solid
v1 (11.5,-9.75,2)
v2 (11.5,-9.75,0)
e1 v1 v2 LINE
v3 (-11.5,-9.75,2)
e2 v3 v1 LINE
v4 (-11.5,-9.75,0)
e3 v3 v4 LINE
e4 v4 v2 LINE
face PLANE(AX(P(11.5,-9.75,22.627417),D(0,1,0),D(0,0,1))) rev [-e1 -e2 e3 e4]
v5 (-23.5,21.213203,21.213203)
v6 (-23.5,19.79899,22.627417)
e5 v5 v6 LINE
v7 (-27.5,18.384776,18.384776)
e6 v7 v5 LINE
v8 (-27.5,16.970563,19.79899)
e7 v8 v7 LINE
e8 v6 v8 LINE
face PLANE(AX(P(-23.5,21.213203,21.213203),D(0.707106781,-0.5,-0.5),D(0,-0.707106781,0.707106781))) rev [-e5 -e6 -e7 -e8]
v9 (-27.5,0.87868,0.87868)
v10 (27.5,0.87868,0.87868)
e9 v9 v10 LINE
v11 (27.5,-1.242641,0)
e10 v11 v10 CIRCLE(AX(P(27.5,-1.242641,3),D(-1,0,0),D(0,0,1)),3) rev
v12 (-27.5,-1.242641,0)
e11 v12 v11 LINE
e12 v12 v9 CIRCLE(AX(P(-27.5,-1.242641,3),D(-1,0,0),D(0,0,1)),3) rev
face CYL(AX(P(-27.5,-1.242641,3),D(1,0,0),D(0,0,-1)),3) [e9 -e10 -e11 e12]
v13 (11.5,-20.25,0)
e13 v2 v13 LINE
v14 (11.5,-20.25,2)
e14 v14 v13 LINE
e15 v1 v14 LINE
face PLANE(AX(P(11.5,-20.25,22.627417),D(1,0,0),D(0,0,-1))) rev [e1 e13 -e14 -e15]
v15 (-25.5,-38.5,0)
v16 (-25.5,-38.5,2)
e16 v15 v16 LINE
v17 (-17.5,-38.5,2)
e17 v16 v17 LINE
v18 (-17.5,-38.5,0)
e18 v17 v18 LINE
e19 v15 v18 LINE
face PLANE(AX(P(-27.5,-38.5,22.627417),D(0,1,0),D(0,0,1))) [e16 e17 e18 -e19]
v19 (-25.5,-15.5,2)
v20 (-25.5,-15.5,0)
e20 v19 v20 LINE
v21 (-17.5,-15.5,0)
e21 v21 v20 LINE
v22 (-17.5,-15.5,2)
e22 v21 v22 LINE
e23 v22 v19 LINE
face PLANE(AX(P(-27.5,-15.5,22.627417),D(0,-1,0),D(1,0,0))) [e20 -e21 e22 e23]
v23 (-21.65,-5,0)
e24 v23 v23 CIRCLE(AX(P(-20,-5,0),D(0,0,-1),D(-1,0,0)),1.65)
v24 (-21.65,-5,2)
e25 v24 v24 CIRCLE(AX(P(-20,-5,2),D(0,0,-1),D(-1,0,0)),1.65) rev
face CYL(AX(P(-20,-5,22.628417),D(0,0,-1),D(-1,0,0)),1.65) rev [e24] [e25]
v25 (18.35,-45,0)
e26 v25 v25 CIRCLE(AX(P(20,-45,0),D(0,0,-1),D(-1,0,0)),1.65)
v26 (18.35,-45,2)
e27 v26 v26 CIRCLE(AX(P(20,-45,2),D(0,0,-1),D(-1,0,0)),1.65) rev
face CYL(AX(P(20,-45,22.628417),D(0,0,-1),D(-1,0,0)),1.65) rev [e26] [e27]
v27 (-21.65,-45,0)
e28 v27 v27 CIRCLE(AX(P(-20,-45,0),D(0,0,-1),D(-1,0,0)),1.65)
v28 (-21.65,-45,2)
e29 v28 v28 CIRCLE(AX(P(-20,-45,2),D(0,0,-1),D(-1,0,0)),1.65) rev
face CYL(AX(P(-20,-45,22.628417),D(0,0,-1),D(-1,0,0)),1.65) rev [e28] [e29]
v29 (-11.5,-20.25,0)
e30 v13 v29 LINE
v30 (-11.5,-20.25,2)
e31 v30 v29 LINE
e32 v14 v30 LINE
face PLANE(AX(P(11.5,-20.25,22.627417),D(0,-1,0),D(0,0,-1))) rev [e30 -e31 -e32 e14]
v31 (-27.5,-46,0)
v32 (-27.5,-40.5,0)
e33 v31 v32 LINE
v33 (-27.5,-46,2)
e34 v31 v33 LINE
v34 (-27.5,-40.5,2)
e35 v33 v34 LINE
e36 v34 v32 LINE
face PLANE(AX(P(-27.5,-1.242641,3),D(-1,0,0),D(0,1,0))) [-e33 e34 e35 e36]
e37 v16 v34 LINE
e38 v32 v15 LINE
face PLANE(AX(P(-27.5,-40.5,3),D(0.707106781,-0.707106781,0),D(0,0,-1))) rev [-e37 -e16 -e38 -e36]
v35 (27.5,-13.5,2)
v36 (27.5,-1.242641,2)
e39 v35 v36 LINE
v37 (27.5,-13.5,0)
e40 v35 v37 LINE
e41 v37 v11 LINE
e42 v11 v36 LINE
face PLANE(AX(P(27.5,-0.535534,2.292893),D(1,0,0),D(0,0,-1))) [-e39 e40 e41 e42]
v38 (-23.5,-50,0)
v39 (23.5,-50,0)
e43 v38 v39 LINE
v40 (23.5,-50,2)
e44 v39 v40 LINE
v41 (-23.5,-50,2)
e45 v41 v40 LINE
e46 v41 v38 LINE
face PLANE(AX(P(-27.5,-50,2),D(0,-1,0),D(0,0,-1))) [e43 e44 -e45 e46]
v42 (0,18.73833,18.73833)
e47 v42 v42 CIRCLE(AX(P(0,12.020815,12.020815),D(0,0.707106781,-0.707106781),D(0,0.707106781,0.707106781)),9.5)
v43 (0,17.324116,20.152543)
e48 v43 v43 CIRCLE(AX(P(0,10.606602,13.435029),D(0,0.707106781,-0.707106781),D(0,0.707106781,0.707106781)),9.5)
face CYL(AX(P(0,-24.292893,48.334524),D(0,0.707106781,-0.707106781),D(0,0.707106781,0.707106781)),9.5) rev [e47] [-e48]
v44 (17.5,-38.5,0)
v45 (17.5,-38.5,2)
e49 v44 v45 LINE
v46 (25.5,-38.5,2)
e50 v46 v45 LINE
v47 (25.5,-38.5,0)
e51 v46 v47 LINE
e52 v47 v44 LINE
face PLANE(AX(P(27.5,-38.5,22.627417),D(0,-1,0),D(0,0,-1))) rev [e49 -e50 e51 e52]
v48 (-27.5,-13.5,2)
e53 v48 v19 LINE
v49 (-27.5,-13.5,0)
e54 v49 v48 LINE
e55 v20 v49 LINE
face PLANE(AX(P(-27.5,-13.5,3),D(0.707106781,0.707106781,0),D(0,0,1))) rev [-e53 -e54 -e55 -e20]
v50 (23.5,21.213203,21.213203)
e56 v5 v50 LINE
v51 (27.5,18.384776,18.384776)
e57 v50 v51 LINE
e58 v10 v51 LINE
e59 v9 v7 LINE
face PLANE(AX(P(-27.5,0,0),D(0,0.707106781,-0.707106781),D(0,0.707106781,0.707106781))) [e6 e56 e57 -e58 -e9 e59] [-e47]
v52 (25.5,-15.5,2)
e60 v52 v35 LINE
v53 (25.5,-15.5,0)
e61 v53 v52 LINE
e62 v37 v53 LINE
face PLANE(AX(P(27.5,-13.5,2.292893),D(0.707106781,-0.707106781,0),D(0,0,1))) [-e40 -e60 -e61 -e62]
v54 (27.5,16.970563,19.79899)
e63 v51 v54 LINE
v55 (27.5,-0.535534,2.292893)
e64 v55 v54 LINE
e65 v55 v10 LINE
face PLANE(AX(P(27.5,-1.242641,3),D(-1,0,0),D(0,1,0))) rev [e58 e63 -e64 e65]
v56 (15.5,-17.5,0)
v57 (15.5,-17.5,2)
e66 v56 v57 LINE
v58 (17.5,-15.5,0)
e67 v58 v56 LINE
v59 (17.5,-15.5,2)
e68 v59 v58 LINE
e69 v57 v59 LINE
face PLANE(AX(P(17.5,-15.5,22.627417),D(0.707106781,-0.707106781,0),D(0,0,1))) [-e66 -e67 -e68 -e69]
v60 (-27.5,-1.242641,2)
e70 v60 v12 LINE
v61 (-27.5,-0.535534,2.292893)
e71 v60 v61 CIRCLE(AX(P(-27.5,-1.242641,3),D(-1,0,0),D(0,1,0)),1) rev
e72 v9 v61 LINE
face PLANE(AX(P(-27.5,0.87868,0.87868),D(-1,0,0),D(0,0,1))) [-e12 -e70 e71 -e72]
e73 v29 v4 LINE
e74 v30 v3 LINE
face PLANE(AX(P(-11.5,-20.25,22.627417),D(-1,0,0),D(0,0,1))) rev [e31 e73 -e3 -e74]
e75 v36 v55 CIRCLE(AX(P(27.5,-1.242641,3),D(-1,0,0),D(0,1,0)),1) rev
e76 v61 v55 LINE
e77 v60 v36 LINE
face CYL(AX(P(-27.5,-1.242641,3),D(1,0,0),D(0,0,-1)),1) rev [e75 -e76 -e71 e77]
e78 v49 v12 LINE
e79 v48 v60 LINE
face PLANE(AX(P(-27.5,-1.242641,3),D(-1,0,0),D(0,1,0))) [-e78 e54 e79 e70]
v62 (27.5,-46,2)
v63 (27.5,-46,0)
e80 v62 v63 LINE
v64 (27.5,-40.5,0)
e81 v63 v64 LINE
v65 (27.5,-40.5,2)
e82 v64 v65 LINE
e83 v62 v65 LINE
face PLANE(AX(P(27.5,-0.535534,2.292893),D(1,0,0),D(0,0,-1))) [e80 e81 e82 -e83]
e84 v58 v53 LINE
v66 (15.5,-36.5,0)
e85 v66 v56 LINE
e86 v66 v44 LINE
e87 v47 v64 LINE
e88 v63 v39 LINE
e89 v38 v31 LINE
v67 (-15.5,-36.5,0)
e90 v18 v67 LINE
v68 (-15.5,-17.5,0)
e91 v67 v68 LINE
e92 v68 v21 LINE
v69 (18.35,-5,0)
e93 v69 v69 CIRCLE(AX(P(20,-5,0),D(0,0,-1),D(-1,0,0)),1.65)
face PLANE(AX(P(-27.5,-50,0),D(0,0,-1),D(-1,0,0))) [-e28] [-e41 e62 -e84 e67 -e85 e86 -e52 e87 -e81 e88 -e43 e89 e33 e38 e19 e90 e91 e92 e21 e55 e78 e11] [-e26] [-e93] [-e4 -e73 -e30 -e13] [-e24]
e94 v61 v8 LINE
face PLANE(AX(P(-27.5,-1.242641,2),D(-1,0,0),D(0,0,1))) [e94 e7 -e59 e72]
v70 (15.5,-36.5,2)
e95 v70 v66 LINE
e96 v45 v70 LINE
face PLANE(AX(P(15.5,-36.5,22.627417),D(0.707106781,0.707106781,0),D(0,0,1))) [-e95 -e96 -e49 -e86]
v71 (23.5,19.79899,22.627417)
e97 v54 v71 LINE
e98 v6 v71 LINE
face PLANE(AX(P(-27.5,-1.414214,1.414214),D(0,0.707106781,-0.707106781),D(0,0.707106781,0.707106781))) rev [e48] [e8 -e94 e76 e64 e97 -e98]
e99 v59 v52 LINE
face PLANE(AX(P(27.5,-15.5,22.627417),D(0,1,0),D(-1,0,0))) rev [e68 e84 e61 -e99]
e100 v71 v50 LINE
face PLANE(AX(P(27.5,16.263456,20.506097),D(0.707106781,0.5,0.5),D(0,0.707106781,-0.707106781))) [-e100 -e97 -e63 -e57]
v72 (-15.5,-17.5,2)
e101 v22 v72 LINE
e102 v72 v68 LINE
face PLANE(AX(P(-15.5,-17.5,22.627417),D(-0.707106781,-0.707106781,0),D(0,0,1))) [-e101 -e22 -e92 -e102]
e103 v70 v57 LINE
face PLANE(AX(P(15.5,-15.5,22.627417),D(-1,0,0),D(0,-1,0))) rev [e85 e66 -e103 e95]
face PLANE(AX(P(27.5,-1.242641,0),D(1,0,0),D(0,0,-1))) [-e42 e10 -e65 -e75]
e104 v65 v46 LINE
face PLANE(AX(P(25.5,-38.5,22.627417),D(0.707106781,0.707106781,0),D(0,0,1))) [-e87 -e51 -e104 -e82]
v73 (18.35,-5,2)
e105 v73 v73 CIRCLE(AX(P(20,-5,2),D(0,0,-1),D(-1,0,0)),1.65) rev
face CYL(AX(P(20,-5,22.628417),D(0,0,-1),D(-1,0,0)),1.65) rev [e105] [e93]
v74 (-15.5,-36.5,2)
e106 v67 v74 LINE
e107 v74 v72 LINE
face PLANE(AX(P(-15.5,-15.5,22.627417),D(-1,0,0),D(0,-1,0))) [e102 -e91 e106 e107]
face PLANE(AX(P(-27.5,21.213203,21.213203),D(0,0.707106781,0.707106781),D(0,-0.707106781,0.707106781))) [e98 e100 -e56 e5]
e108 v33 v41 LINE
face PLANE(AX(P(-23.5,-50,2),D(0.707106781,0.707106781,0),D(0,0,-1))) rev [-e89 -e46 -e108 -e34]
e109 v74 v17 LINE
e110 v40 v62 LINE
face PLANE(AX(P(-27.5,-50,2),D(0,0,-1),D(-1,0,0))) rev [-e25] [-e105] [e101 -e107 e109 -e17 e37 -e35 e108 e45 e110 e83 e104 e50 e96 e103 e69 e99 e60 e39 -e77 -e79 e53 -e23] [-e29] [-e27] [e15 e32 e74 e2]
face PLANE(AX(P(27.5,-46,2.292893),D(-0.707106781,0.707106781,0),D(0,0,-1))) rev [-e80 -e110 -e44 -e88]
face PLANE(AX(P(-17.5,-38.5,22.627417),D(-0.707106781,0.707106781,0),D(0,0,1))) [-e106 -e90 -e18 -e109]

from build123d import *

# Parameters (mm, degrees)
SM_BASE_FLANGE_1_DEPTH = 27.5
CHAMFER_1_SIZE         = 4
SKETCH_6_R             = 9.5
CUT_EXTRUDE_1_DEPTH    = 62.386073339
SKETCH_7_W             = 12
SKETCH_7_H             = 23
CUT_EXTRUDE_2_DEPTH    = 62.386073339
CHAMFER_2_SIZE         = 2
SKETCH_9_W             = 23
SKETCH_9_H             = 10.5
CUT_EXTRUDE_4_DEPTH    = 62.386073339
CUT_EXTRUDE_5_REACH    = 63.386
SKETCH_10_R            = 1.65


# Sheet-metal steps are written as plain solids
with BuildPart() as part:
    # Sketch 1 → 基材-凸緣1 (new, symmetric)
    with BuildSketch(Plane(origin=(0, 0, 0), x_dir=(0, 1, 0), z_dir=(-1, 0, 0))):
        with BuildLine():
            Line((-50, 0), (-1.242640687, 0))
            ThreePointArc((-1.242640687, 0), (-0.09459039, -0.228361402), (0.878679656, -0.878679656))
            Line((0.878679656, -0.878679656), (21.213203436, -21.213203436))
            Line((21.213203436, -21.213203436), (19.798989873, -22.627416998))
            Line((19.798989873, -22.627416998), (-0.535533906, -2.292893219))
            ThreePointArc((-0.535533906, -2.292893219), (-0.859957255, -2.076120467), (-1.242640687, -2))
            Line((-1.242640687, -2), (-50, -2))
            Line((-50, -2), (-50, 0))
        make_face()
    extrude(amount=SM_BASE_FLANGE_1_DEPTH, both=True)

    # 導角1
    chamfer_1_edges = [part.edges().sort_by_distance(p)[0] for p in [
        (-27.5, -50, 1),
        (-27.5, 20.506096654, 21.920310217),
        (27.5, -50, 1),
        (27.5, 20.506096654, 21.920310217),
    ]]
    chamfer(chamfer_1_edges, length=CHAMFER_1_SIZE)

    # 草圖6 → 除料-伸長1 (cut, through all)
    with BuildSketch(Plane(origin=(0, 0, 0), x_dir=(-0.9655064458746985, -0.1841158643007276, -0.18411586430072824), z_dir=(0, 0.7071067811865488, -0.7071067811865465))):
        with Locations(Location((-4.42644559, 16.41360958, 0), (0, 0, 105.092560886))):
            Circle(SKETCH_6_R)
    extrude(amount=-CUT_EXTRUDE_1_DEPTH, mode=Mode.SUBTRACT)

    # 草圖7 → 除料-伸長2 (cut, through all)
    with BuildSketch(Plane(origin=(0, 0, 0), x_dir=(-1, 0, 0), z_dir=(0, 0, -1))):
        with Locations((-21.5, -27)):
            Rectangle(SKETCH_7_W, SKETCH_7_H)
    cut_extrude_2 = extrude(amount=-CUT_EXTRUDE_2_DEPTH, mode=Mode.SUBTRACT)

    # 鏡射1: 除料-伸長2 across plane
    add(cut_extrude_2.mirror(Plane(origin=(0, 0, 0), x_dir=(0, 0, 1), z_dir=(1, 0, 0))), mode=Mode.SUBTRACT)

    # 導角2
    chamfer_2_edges = [part.edges().sort_by_distance(p)[0] for p in [
        (-15.5, -38.5, 1),
        (-15.5, -15.5, 1),
        (27.5, -38.5, 1),
        (27.5, -15.5, 1),
        (15.5, -15.5, 1),
        (15.5, -38.5, 1),
        (-27.5, -15.5, 1),
        (-27.5, -38.5, 1),
    ]]
    chamfer(chamfer_2_edges, length=CHAMFER_2_SIZE)

    # 草圖9 → 除料-伸長4 (cut, through all)
    with BuildSketch(Plane(origin=(0, 0, 0), x_dir=(-1, 0, 0), z_dir=(0, 0, -1))):
        with Locations((0, -15)):
            Rectangle(SKETCH_9_W, SKETCH_9_H)
    extrude(amount=-CUT_EXTRUDE_4_DEPTH, mode=Mode.SUBTRACT)

    # 草圖10 → 除料-伸長5 (cut, up to next)
    with BuildSketch(Plane(origin=(0, 0, 0), x_dir=(-1, 0, 0), z_dir=(0, 0, -1)), mode=Mode.PRIVATE) as cut_extrude_5_sk1:
        with Locations((20, -45)):
            Circle(SKETCH_10_R)
    cut_extrude_5_tool1 = extrude(cut_extrude_5_sk1.sketch, amount=-CUT_EXTRUDE_5_REACH, mode=Mode.PRIVATE) & part.part
    # 草圖10 → 除料-伸長5 (cut, up to next)
    with BuildSketch(Plane(origin=(0, 0, 0), x_dir=(-1, 0, 0), z_dir=(0, 0, -1)), mode=Mode.PRIVATE) as cut_extrude_5_sk2:
        with Locations((-20, -45)):
            Circle(SKETCH_10_R)
    cut_extrude_5_tool2 = extrude(cut_extrude_5_sk2.sketch, amount=-CUT_EXTRUDE_5_REACH, mode=Mode.PRIVATE) & part.part
    # 草圖10 → 除料-伸長5 (cut, up to next)
    with BuildSketch(Plane(origin=(0, 0, 0), x_dir=(-1, 0, 0), z_dir=(0, 0, -1)), mode=Mode.PRIVATE) as cut_extrude_5_sk3:
        with Locations((-20, -5)):
            Circle(SKETCH_10_R)
    cut_extrude_5_tool3 = extrude(cut_extrude_5_sk3.sketch, amount=-CUT_EXTRUDE_5_REACH, mode=Mode.PRIVATE) & part.part
    # 草圖10 → 除料-伸長5 (cut, up to next)
    with BuildSketch(Plane(origin=(0, 0, 0), x_dir=(-1, 0, 0), z_dir=(0, 0, -1)), mode=Mode.PRIVATE) as cut_extrude_5_sk4:
        with Locations((20, -5)):
            Circle(SKETCH_10_R)
    cut_extrude_5_tool4 = extrude(cut_extrude_5_sk4.sketch, amount=-CUT_EXTRUDE_5_REACH, mode=Mode.PRIVATE) & part.part
    add(cut_extrude_5_tool1.solids().sort_by_distance((-20, -45, 0))[0], mode=Mode.SUBTRACT)
    add(cut_extrude_5_tool2.solids().sort_by_distance((20, -45, 0))[0], mode=Mode.SUBTRACT)
    add(cut_extrude_5_tool3.solids().sort_by_distance((20, -5, 0))[0], mode=Mode.SUBTRACT)
    add(cut_extrude_5_tool4.solids().sort_by_distance((-20, -5, 0))[0], mode=Mode.SUBTRACT)


solid = part.part
